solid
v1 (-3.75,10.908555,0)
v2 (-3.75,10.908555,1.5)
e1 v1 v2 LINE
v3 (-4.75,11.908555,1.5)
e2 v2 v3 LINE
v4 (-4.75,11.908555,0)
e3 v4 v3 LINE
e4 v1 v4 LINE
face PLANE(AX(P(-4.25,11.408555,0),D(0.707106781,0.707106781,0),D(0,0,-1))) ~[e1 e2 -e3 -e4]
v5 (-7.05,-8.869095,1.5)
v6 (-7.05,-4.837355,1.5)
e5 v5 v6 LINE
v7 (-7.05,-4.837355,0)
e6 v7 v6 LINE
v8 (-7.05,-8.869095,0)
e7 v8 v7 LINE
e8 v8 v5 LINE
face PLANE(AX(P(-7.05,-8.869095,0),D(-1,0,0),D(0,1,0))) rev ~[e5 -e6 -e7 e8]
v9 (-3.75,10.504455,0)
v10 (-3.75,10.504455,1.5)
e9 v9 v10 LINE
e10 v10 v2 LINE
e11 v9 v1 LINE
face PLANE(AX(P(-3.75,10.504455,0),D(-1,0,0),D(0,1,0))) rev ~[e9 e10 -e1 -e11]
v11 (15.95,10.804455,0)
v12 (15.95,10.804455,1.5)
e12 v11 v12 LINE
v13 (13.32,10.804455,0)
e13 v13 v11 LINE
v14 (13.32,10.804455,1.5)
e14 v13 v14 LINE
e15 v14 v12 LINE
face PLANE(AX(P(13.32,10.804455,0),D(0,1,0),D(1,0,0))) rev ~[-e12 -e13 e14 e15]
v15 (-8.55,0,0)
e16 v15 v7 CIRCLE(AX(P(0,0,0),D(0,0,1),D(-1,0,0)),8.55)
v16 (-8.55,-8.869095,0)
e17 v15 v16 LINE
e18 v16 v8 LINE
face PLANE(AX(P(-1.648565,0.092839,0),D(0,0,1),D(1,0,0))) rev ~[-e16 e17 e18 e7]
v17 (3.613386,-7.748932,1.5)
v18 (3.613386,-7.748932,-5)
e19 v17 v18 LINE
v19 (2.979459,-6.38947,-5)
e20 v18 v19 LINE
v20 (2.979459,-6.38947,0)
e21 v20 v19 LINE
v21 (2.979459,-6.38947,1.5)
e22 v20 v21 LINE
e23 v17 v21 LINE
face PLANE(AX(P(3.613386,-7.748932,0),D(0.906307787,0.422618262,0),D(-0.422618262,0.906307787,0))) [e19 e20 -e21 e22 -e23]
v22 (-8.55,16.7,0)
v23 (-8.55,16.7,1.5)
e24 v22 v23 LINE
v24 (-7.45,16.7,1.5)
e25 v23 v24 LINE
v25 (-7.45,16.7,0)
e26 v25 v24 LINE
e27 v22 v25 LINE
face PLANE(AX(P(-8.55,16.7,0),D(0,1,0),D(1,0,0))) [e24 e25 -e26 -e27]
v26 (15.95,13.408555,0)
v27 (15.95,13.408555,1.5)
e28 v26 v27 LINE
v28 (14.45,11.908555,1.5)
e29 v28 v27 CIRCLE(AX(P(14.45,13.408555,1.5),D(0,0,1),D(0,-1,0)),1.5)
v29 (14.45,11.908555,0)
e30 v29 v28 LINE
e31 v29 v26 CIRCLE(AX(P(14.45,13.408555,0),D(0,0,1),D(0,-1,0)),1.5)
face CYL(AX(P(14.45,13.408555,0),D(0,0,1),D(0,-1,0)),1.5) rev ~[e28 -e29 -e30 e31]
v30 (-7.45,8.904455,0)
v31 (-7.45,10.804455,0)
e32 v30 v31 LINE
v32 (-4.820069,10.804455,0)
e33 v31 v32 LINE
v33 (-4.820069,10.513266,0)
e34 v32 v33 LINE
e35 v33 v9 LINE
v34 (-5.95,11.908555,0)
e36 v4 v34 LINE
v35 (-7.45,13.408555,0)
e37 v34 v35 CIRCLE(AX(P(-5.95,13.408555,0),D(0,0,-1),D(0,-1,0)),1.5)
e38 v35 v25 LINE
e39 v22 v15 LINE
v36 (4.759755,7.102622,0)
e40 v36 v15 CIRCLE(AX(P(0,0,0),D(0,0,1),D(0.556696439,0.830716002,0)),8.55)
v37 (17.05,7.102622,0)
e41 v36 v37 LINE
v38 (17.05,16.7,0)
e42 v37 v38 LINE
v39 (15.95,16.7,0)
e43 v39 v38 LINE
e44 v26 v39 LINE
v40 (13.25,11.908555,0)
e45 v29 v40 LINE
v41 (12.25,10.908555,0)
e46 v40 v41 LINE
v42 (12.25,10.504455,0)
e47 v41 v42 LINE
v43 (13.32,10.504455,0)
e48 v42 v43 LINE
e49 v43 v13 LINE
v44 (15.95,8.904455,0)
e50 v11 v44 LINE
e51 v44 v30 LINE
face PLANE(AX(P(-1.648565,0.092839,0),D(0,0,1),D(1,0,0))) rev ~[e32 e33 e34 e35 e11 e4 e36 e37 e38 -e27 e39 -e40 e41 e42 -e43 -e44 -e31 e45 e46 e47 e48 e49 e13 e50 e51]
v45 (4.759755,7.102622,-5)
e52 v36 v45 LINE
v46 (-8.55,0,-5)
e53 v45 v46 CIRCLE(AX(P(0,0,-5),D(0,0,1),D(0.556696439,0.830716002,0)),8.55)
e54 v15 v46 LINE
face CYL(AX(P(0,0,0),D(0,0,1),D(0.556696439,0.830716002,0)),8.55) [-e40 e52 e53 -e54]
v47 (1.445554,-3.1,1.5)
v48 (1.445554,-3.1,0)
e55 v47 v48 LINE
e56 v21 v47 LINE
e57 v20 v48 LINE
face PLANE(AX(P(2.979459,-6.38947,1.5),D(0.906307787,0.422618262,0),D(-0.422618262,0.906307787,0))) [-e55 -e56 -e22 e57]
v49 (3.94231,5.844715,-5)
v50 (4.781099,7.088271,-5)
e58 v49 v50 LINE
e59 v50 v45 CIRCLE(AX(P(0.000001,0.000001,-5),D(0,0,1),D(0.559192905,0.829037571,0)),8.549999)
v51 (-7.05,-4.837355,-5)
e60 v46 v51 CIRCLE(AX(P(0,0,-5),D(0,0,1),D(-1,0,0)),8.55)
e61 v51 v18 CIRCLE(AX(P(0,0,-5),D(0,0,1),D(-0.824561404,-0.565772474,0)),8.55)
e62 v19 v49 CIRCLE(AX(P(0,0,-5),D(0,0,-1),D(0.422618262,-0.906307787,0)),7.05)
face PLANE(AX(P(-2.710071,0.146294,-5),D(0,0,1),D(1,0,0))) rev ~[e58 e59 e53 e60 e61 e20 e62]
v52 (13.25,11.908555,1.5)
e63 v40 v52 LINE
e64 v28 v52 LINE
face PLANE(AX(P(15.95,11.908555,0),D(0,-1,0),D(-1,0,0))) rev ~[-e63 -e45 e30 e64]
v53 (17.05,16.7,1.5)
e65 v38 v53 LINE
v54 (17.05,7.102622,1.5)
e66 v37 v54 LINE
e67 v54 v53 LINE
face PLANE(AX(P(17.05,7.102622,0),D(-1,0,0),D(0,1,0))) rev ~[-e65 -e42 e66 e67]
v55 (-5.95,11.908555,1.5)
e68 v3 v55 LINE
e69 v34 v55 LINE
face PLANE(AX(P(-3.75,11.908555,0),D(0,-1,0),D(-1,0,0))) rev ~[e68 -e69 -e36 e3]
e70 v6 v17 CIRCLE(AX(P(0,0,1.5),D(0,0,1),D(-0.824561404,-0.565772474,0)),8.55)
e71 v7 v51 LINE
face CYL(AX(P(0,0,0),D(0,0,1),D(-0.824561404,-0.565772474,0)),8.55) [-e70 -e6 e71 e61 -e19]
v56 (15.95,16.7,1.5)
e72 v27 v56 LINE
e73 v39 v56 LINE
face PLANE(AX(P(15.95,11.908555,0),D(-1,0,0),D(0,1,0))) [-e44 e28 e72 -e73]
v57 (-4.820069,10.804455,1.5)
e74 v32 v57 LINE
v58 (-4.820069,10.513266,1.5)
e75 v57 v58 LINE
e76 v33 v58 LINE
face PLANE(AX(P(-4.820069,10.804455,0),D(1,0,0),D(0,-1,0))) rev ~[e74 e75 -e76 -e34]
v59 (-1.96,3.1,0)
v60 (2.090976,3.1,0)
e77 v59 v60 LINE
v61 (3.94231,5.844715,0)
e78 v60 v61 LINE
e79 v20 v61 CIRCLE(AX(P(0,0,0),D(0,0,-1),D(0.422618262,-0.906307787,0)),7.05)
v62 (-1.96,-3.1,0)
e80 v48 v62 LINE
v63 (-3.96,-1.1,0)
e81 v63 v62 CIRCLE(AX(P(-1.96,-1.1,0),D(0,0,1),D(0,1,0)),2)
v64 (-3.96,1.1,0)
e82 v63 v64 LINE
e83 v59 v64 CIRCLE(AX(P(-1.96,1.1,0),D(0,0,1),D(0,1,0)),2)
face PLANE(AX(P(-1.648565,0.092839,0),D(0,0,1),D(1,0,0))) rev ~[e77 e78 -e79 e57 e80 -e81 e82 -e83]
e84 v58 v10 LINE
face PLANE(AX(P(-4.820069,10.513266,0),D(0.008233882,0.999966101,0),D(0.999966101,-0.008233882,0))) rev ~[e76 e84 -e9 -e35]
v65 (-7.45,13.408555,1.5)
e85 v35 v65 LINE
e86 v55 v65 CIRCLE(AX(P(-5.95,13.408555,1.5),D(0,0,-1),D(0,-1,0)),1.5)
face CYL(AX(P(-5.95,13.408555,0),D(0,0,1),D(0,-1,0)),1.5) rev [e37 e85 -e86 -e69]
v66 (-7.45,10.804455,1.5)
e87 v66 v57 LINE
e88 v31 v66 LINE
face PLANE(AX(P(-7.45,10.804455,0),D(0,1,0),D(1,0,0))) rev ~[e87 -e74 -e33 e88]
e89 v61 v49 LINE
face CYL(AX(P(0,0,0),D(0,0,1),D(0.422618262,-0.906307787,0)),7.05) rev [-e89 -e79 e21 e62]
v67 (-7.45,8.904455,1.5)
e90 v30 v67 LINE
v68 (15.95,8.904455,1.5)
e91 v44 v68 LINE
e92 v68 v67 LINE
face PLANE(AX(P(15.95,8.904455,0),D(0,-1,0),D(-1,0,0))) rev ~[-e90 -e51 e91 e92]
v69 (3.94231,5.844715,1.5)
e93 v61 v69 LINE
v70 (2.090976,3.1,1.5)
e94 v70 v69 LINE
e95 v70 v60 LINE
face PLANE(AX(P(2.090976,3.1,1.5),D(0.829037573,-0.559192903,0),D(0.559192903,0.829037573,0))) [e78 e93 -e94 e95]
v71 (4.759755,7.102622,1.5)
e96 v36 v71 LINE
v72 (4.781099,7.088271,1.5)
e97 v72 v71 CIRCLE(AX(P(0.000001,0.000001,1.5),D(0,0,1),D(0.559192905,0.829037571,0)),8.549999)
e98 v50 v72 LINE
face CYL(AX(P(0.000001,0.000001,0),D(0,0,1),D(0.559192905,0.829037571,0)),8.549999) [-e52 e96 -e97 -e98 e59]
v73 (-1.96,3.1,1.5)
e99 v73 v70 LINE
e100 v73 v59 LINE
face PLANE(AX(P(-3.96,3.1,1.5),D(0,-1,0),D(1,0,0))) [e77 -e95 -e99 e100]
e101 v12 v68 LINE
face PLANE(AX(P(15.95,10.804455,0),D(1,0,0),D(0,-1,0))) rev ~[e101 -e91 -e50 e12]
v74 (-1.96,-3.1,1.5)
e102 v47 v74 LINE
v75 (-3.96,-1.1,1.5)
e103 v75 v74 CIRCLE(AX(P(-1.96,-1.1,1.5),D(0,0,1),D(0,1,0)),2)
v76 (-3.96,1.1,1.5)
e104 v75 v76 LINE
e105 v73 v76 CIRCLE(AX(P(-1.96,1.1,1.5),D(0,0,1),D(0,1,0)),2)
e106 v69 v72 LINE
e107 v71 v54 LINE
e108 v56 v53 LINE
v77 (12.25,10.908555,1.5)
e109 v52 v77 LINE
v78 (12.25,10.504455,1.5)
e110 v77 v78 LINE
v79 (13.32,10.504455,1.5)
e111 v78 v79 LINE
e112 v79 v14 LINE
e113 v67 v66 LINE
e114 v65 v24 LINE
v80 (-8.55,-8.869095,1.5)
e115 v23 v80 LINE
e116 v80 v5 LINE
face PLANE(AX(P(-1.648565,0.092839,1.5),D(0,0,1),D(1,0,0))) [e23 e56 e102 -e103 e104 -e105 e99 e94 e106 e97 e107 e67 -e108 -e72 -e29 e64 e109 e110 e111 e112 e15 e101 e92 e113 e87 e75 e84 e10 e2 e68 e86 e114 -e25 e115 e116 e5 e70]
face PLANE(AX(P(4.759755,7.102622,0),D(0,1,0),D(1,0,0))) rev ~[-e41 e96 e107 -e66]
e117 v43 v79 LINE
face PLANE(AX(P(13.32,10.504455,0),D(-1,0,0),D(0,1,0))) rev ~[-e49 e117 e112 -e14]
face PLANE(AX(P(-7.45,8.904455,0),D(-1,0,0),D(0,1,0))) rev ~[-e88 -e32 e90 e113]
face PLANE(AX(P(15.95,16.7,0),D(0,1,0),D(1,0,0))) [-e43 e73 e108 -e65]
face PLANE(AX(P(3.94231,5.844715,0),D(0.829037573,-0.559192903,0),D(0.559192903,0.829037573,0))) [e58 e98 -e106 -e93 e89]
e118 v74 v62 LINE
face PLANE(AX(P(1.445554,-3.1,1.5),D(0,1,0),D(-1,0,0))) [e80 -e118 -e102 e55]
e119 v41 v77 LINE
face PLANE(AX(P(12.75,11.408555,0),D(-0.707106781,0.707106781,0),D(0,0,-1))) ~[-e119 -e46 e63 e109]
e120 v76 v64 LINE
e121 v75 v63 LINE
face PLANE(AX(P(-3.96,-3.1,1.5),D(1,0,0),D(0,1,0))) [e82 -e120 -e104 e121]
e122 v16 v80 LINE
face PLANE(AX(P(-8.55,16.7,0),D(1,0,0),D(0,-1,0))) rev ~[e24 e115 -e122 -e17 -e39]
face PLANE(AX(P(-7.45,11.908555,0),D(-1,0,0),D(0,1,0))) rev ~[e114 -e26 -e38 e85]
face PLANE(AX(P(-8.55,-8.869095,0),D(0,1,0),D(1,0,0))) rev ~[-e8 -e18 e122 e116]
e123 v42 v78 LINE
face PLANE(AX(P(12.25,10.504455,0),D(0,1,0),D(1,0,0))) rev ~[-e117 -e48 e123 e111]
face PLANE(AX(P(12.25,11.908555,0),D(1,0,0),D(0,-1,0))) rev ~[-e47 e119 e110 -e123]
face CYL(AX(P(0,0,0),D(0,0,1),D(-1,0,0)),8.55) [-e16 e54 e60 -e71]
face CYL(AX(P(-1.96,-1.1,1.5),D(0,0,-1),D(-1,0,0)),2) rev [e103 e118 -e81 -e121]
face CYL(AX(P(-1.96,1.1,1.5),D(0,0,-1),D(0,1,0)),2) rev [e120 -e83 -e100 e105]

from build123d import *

# Parameters (mm, degrees)
F0_W     = 1.1
F0_H     = 4.7914452539
F1_DEPTH = 1.5
F2_SIZE  = 1
F3_R     = 1.5
F5_DEPTH = 1.5
F6_DEPTH = 5
F7_R     = 2


# Not quite as in the source:
# - a feature names something its author has since deleted; it is built from what else it names


with BuildPart() as f1:
    # F0 (on Top) → F1 (new body)
    with BuildSketch(Plane.XY):
        with BuildLine():
            ThreePointArc((-8.55, 0), (-4.0253321977, 7.5431558845), (4.7597545494, 7.1026218138))
            Line((4.7597545494, 7.1026218138), (4.7907789053, 7.1026218138))
            Line((4.7907789053, 7.1026218138), (6.0061305772, 8.9044547655))
            Line((6.0061305772, 8.9044547655), (-7.45, 8.9044547655))
            Line((-7.45, 8.9044547655), (-7.45, 10.8044547655))
            Line((-7.45, 10.8044547655), (-4.820069465, 10.8044547655))
            Line((-4.820069465, 10.8044547655), (-4.820069465, 10.5132658899))
            Line((-4.820069465, 10.5132658899), (-3.75, 10.5044547655))
            Line((-3.75, 10.5044547655), (-3.75, 10.8044547655))
            Line((-3.75, 10.8044547655), (-3.75, 11.9085547461))
            Line((-3.75, 11.9085547461), (-7.45, 11.9085547461))
            Line((-7.45, 11.9085547461), (-8.55, 11.9085547461))
            Line((-8.55, 11.9085547461), (-8.55, 10.5085547461))
            Line((-8.55, 10.5085547461), (-8.55, 0))
        make_face()
        with BuildLine():
            Line((-7.05, -8.869094649), (-7.05, -4.837354649))
            ThreePointArc((-7.05, -4.837354649), (-8.1663945533, -2.5322914524), (-8.55, 0))
            Line((-8.55, 0), (-8.55, -8.869094649))
            Line((-8.55, -8.869094649), (-7.05, -8.869094649))
        make_face()
        with BuildLine():
            ThreePointArc((2.9794587453, -6.3894698986), (-7.0282672028, 0.5531366249), (3.9423099695, 5.8447148865))
            Line((3.9423099695, 5.8447148865), (4.7810993247, 7.0882712453))
            ThreePointArc((4.7810993247, 7.0882712453), (4.7704323333, 7.0954545558), (4.7597545494, 7.1026218138))
            ThreePointArc((4.7597545494, 7.1026218138), (-4.0253321977, 7.5431558845), (-8.55, 0))
            ThreePointArc((-8.55, 0), (-8.1663945533, -2.5322914524), (-7.05, -4.837354649))
            ThreePointArc((-7.05, -4.837354649), (-2.2520876458, -8.248066515), (3.6133861379, -7.7489315792))
            Line((3.6133861379, -7.7489315792), (2.9794587453, -6.3894698986))
        make_face()
        Polygon((6.0061305772, 8.9044547655), (4.7907789053, 7.1026218138), (15.4494866027, 7.1026218138), (17.05, 7.1026218138), (17.05, 11.9085547461), (15.95, 11.9085547461), (12.25, 11.9085547461), (12.25, 10.8044547655), (12.25, 10.5044547655), (13.32, 10.5044547655), (13.32, 10.8044547655), (15.95, 10.8044547655), (15.95, 8.9044547655), align=None)
        with Locations((-8, 14.3042773731)):
            Rectangle(F0_W, F0_H)
        with Locations((16.5, 14.3042773731)):
            Rectangle(F0_W, F0_H)
    extrude(amount=F1_DEPTH)

    # F2
    f2_edges = [f1.edges().sort_by_distance(p)[0] for p in [
        (-3.75, 11.908555, 0.75),
        (12.25, 11.908555, 0.75),
    ]]
    chamfer(f2_edges, length=F2_SIZE)

    # F3
    f3_edges = [f1.edges().sort_by_distance(p)[0] for p in [
        (-7.45, 11.908555, 0.75),
        (15.95, 11.908555, 0.75),
    ]]
    fillet(f3_edges, radius=F3_R)

    # F4 (on face) → F5 (join)
    with BuildSketch(Plane.XY.offset(1.5)):
        with BuildLine():
            Line((2.0909764022, 3.1), (3.9423099695, 5.8447148865))
            ThreePointArc((3.9423099695, 5.8447148865), (-7.0282672028, 0.5531366249), (2.9794587453, -6.3894698986))
            Line((2.9794587453, -6.3894698986), (1.4455537403, -3.1))
            Line((1.4455537403, -3.1), (-3.96, -3.1))
            Line((-3.96, -3.1), (-3.96, 3.1))
            Line((-3.96, 3.1), (2.0909764022, 3.1))
        make_face()
    extrude(amount=-F5_DEPTH)

    # F0 (on Top) → F6 (join)
    with BuildSketch(Plane.XY):
        with BuildLine():
            ThreePointArc((2.9794587453, -6.3894698986), (-7.0282672028, 0.5531366249), (3.9423099695, 5.8447148865))
            Line((3.9423099695, 5.8447148865), (4.7810993247, 7.0882712453))
            ThreePointArc((4.7810993247, 7.0882712453), (4.7704323333, 7.0954545558), (4.7597545494, 7.1026218138))
            ThreePointArc((4.7597545494, 7.1026218138), (-4.0253321977, 7.5431558845), (-8.55, 0))
            ThreePointArc((-8.55, 0), (-8.1663945533, -2.5322914524), (-7.05, -4.837354649))
            ThreePointArc((-7.05, -4.837354649), (-2.2520876458, -8.248066515), (3.6133861379, -7.7489315792))
            Line((3.6133861379, -7.7489315792), (2.9794587453, -6.3894698986))
        make_face()
    extrude(amount=-F6_DEPTH)

    # F7
    f7_edges = [f1.edges().sort_by_distance(p)[0] for p in [
        (-3.96, 3.1, 0.75),
        (-3.96, -3.1, 0.75),
    ]]
    fillet(f7_edges, radius=F7_R)


solid = f1.part
